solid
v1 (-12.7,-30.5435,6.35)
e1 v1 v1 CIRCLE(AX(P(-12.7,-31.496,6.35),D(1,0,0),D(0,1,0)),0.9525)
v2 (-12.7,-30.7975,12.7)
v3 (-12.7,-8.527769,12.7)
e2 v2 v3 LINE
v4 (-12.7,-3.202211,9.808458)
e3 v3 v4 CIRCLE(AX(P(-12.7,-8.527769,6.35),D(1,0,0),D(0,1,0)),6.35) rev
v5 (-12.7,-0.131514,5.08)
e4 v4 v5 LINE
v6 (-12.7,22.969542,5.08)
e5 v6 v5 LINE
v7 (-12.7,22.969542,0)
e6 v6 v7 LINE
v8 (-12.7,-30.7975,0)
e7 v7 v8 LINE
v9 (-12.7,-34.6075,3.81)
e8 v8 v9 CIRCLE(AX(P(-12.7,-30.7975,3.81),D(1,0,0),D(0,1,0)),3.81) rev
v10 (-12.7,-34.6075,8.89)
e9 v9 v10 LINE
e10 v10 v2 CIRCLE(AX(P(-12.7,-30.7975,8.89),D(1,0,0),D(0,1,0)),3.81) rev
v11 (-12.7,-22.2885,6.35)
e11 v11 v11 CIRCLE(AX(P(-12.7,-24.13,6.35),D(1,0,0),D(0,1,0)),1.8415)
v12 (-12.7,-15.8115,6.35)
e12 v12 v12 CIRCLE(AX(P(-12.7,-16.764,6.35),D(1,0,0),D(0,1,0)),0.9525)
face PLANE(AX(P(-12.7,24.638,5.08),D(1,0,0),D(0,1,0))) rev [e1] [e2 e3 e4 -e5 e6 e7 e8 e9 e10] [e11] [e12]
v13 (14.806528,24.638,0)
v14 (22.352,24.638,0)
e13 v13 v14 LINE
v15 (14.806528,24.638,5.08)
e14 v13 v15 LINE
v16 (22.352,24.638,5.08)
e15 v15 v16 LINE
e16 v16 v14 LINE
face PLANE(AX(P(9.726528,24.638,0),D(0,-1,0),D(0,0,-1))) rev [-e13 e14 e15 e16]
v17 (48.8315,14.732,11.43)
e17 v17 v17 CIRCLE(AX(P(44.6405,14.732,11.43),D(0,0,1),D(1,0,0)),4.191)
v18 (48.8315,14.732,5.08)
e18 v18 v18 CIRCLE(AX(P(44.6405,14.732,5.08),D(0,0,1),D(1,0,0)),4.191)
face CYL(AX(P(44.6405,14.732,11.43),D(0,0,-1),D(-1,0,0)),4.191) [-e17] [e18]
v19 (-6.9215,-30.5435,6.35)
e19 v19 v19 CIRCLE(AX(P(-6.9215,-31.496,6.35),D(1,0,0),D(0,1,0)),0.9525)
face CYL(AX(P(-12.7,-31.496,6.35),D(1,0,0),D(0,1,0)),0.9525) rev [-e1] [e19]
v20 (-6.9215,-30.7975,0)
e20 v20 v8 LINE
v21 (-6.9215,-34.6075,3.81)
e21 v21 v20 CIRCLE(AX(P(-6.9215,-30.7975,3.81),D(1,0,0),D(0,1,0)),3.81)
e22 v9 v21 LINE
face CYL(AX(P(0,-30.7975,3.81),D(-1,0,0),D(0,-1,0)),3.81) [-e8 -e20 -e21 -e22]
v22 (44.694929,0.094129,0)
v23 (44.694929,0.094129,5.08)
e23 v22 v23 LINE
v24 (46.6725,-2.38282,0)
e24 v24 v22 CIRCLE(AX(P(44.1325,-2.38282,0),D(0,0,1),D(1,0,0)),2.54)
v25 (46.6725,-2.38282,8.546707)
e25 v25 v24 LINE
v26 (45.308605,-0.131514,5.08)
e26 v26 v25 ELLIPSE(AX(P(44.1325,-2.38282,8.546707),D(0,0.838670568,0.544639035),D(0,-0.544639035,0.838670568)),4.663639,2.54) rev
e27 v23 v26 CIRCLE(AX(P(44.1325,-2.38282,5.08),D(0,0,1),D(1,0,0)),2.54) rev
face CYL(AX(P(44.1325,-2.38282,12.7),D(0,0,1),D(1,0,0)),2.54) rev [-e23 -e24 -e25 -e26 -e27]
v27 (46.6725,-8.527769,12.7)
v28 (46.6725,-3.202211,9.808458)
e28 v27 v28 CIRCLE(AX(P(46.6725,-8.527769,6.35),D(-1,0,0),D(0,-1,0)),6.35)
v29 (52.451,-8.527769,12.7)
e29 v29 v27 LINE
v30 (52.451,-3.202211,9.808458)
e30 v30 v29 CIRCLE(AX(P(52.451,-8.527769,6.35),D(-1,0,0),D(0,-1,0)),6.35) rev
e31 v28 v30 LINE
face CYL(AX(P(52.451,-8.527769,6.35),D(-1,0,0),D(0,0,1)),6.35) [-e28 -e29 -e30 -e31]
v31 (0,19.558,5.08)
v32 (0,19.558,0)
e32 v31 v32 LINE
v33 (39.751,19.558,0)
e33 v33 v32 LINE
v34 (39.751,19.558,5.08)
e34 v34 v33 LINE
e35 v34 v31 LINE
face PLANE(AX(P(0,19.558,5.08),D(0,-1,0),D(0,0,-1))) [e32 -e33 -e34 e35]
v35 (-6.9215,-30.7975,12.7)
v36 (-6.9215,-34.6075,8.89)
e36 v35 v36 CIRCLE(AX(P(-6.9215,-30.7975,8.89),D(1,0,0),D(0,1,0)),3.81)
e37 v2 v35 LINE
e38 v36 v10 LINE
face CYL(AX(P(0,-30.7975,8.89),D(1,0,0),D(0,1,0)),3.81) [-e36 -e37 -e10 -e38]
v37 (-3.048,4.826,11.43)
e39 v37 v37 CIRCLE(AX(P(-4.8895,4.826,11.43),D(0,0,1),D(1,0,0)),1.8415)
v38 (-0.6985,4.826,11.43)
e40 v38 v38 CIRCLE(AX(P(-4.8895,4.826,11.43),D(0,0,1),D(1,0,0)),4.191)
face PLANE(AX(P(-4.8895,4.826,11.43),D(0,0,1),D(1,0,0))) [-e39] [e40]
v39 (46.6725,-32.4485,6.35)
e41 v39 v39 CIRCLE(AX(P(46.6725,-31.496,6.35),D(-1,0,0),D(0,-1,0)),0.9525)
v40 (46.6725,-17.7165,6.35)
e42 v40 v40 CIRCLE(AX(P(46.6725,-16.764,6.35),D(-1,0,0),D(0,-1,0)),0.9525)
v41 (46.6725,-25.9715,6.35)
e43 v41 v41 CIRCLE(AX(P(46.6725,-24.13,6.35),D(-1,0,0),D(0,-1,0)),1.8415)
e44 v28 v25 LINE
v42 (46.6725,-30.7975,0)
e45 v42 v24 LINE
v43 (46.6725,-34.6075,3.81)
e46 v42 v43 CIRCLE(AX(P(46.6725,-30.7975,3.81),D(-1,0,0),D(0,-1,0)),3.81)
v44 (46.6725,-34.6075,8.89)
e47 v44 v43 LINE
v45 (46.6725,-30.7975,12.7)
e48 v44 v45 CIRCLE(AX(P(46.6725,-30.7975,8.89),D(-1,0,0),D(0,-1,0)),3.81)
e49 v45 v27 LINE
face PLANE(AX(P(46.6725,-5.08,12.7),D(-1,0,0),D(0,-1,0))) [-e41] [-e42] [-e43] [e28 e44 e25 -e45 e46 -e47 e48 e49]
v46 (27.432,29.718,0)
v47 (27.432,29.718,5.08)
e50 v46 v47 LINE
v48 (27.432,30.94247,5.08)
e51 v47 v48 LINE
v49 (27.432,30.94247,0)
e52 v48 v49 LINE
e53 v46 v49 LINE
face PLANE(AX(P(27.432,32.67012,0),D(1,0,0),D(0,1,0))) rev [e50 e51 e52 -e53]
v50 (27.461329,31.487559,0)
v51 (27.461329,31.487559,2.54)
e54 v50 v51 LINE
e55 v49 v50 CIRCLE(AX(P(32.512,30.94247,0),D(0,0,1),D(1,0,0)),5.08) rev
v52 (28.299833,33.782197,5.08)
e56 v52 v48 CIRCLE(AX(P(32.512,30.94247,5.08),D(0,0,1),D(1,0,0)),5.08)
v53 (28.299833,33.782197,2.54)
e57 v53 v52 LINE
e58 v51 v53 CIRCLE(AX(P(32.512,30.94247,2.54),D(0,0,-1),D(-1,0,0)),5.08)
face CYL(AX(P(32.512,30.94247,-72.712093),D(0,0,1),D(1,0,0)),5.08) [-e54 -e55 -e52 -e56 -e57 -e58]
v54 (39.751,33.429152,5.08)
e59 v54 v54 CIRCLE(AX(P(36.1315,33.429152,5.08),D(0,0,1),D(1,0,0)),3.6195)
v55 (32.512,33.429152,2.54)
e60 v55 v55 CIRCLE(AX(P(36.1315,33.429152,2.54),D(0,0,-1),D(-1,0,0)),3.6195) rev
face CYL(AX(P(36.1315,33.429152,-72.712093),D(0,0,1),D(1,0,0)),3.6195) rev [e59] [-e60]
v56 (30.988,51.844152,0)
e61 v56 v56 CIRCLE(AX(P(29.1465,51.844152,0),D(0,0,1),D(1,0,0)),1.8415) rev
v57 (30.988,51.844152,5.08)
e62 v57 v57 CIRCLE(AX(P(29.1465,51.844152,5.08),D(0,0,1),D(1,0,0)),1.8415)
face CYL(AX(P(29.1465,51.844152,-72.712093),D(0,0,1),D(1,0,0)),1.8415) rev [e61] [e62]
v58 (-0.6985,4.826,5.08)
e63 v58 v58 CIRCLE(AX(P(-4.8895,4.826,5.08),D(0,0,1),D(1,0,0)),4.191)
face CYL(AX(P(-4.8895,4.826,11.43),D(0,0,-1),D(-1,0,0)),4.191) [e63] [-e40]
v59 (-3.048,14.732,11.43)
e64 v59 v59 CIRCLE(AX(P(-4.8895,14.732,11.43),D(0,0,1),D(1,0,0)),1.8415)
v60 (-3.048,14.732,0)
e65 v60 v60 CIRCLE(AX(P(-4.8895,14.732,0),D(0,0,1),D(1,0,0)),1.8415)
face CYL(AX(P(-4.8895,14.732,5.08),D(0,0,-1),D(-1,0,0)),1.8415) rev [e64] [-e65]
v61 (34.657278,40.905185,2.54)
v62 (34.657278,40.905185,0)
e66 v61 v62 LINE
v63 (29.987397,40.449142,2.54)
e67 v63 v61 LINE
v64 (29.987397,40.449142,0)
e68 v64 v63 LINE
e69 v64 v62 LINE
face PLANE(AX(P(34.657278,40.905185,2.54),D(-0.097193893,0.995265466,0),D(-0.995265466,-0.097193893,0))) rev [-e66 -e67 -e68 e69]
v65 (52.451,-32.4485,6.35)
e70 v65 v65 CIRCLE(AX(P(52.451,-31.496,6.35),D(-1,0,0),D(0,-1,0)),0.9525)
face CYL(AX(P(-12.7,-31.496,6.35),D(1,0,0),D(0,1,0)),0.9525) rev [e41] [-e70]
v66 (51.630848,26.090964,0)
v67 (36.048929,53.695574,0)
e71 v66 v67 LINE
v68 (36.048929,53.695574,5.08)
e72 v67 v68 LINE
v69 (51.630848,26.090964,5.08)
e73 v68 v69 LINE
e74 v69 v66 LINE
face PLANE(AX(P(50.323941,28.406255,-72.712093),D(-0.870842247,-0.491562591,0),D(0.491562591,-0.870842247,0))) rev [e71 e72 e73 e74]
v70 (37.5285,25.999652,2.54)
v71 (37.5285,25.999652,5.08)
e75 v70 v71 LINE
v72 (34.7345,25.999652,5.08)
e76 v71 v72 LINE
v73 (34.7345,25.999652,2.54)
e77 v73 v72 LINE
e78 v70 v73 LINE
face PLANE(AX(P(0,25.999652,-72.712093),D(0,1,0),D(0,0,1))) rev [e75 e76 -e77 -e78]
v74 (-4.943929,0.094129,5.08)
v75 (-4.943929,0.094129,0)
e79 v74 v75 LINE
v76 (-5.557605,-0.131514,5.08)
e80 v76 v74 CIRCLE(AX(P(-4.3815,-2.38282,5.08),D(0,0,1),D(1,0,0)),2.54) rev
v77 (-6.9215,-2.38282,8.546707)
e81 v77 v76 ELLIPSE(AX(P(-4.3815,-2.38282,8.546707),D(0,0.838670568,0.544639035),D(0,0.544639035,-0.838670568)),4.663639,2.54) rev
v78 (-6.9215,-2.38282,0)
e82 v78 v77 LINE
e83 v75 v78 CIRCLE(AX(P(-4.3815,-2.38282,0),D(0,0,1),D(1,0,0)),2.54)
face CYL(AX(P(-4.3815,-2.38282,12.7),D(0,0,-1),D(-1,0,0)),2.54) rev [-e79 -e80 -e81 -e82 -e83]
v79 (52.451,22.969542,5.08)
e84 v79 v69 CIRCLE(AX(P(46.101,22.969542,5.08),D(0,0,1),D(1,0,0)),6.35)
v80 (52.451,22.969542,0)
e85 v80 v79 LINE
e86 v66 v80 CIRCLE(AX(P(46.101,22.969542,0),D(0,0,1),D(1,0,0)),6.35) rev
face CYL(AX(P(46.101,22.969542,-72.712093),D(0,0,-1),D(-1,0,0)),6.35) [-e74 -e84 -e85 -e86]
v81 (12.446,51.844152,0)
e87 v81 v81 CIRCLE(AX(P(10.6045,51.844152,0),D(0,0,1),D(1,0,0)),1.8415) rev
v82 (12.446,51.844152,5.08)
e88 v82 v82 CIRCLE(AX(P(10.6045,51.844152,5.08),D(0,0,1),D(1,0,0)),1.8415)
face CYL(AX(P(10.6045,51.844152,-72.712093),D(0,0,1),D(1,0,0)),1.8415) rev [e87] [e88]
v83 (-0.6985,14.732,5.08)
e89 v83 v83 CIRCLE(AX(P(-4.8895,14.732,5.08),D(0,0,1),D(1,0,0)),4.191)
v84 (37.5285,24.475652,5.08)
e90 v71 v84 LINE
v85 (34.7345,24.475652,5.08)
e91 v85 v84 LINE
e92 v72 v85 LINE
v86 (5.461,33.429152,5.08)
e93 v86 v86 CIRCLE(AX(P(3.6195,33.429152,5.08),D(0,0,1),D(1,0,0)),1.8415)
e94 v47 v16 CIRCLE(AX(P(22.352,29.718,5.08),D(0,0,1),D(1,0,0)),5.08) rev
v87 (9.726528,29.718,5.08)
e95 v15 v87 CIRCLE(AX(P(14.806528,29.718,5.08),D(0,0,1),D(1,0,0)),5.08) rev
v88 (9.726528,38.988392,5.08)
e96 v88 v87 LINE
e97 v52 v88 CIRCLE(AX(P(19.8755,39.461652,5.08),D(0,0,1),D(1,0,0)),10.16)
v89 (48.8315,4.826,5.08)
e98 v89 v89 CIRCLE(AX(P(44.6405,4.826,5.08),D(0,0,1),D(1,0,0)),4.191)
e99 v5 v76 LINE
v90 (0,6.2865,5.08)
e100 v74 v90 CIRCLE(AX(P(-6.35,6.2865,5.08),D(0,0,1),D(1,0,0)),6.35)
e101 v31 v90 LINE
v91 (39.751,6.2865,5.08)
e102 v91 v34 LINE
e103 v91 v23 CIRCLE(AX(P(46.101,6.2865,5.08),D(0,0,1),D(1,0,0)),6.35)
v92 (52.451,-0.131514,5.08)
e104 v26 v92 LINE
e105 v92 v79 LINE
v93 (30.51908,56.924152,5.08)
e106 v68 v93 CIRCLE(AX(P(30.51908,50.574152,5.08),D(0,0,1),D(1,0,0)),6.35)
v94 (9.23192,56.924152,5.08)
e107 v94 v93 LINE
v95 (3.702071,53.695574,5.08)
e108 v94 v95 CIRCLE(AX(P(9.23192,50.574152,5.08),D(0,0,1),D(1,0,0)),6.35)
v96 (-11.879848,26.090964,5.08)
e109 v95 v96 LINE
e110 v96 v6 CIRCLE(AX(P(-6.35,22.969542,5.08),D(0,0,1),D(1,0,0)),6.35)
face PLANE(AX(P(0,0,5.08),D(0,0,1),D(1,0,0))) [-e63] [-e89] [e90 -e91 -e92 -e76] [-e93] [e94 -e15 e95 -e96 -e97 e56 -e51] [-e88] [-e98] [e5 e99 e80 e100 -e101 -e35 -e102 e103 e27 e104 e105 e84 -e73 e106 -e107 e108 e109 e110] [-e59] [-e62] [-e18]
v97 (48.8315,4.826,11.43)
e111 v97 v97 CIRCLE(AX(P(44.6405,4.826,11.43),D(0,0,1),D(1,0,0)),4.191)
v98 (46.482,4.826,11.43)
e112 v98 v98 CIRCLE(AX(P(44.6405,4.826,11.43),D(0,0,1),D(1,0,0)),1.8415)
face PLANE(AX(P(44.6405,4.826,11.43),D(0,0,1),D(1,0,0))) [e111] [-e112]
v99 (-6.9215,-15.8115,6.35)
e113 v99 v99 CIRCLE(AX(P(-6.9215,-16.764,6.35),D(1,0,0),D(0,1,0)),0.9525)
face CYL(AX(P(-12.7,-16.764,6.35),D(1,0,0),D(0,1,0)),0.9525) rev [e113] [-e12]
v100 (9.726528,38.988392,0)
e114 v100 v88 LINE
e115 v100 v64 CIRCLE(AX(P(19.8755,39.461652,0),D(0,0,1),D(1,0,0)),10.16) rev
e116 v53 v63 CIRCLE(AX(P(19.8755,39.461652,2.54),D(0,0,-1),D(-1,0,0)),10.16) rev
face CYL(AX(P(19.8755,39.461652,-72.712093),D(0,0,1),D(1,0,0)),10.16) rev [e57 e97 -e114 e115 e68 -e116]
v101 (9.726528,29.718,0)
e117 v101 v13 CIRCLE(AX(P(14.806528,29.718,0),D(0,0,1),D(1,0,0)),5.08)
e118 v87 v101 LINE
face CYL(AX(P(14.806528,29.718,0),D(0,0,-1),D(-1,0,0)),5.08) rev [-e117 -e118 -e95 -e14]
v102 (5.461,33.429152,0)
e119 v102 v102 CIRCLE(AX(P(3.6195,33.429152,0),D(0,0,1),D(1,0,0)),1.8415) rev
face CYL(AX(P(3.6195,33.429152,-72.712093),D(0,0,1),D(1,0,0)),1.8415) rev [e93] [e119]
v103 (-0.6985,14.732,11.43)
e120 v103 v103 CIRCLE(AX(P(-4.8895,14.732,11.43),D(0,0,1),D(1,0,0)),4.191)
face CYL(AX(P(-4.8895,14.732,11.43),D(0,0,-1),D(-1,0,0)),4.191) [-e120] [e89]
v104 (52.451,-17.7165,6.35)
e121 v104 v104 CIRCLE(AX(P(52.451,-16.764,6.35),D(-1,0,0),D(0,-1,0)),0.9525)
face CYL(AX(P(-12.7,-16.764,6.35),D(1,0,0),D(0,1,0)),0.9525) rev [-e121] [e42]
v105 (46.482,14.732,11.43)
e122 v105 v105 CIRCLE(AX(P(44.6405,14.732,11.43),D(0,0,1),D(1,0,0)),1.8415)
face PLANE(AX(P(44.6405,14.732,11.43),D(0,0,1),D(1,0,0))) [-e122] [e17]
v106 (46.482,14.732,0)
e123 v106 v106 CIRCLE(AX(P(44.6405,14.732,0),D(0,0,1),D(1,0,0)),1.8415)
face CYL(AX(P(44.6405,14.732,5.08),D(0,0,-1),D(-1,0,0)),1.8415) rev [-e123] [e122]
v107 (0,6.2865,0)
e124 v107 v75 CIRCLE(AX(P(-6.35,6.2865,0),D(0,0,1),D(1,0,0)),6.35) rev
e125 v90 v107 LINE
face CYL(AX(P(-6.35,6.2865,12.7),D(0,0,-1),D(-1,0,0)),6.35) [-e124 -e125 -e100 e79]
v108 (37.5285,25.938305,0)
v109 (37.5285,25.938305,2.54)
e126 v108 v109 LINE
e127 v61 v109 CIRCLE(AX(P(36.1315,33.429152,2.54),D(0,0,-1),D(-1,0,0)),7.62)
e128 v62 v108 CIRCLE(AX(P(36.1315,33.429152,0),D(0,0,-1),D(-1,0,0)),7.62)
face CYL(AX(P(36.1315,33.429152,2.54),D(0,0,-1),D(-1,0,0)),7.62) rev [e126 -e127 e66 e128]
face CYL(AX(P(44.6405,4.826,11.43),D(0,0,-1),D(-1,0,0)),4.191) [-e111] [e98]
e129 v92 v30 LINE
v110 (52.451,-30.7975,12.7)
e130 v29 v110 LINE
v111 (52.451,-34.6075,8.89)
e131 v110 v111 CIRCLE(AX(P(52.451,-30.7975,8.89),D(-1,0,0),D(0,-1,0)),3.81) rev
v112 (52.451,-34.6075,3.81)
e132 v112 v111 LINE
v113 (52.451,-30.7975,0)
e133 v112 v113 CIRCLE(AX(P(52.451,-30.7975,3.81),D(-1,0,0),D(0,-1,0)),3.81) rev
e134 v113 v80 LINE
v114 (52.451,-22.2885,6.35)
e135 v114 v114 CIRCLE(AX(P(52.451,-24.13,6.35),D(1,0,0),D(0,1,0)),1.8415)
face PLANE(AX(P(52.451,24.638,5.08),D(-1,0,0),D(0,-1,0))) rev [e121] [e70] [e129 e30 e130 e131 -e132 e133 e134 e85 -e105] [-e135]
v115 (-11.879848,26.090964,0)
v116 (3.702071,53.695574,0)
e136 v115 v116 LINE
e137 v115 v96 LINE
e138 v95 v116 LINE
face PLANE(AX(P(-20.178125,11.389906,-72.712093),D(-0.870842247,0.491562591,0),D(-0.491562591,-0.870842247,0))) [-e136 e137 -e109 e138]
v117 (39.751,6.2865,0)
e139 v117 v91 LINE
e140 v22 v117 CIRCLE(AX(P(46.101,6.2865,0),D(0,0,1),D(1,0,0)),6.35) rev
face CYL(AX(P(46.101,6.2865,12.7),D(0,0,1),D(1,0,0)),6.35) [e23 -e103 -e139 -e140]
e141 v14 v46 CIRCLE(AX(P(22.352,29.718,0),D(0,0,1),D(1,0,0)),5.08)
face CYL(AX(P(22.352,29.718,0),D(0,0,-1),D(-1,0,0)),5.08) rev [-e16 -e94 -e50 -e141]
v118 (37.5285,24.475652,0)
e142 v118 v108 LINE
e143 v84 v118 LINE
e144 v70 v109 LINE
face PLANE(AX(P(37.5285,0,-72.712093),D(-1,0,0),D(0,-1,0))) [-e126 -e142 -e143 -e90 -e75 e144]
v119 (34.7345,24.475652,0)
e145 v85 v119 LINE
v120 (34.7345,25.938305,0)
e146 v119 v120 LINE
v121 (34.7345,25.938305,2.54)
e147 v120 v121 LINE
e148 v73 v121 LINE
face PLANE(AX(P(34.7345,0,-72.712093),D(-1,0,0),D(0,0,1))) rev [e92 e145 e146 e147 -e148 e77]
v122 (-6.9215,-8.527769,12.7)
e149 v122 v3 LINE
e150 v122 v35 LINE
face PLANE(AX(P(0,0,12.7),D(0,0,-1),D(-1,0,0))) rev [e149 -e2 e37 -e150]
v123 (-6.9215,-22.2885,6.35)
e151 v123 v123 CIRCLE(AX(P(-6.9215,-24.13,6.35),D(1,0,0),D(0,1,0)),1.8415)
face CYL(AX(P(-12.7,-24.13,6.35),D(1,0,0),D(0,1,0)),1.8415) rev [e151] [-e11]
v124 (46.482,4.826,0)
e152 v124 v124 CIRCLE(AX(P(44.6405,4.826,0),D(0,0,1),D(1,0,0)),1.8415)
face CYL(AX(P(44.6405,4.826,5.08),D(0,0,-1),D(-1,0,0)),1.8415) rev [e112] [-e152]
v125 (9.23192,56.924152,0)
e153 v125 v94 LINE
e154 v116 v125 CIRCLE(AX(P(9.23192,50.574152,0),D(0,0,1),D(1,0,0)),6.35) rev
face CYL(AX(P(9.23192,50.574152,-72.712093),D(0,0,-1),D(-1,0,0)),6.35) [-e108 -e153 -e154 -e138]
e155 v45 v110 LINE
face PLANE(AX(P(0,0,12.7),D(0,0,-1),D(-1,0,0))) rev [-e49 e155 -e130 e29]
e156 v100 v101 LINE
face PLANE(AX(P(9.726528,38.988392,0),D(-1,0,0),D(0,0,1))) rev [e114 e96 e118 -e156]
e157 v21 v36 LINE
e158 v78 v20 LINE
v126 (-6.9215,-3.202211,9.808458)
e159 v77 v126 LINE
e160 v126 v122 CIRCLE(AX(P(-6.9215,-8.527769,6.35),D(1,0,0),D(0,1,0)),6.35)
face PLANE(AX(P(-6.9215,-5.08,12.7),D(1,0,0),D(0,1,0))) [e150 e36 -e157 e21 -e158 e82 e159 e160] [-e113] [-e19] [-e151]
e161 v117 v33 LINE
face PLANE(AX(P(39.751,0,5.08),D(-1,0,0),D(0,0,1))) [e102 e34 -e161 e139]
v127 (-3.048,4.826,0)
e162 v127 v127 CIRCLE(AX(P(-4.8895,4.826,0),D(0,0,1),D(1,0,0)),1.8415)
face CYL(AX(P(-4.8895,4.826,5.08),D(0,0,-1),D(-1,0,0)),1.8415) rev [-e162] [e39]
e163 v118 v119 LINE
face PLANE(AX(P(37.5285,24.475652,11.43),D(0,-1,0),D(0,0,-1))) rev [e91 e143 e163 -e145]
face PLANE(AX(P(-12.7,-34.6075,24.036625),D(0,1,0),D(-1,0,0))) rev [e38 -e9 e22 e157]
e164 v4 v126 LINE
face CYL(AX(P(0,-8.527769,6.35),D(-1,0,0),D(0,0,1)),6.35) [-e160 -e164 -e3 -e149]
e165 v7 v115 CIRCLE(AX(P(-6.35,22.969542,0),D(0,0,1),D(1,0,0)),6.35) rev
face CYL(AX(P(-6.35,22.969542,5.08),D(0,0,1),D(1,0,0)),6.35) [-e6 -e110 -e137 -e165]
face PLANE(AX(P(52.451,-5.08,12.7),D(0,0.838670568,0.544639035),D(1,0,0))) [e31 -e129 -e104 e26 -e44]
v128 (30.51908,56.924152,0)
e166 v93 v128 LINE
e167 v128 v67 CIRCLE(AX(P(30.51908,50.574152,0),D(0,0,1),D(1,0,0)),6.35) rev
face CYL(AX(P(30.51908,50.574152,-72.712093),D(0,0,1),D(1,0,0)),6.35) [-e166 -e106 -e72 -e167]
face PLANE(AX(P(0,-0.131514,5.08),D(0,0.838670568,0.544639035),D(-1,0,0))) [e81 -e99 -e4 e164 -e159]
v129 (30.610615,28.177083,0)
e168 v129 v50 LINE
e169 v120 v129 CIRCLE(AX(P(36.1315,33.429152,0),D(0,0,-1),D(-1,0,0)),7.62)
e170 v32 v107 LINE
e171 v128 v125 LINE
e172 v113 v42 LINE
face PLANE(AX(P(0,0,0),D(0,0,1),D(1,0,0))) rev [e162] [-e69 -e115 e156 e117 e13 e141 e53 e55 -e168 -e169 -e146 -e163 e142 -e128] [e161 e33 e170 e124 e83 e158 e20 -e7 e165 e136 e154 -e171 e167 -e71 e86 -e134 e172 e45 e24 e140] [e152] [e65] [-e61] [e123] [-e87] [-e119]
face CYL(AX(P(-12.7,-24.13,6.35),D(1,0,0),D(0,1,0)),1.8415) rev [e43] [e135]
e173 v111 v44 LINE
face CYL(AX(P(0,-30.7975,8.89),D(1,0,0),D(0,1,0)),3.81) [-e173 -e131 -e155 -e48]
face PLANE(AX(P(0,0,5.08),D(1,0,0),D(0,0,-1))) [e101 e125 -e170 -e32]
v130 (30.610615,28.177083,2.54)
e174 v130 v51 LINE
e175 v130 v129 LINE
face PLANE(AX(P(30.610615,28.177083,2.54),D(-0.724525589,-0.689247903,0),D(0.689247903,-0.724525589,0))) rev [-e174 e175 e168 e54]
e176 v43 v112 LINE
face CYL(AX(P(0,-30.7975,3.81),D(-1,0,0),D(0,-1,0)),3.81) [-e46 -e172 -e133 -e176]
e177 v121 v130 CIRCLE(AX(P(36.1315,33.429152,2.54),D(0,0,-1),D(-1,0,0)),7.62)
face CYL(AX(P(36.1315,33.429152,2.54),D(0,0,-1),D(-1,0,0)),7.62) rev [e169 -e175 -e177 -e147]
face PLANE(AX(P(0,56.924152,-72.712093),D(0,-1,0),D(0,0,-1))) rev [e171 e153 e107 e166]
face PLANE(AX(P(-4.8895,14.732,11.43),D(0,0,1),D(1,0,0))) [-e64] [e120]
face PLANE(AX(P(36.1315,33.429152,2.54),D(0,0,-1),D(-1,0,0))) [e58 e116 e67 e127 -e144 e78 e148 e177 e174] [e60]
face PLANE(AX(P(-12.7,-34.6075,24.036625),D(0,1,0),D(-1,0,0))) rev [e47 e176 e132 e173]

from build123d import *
from OCP.BRepFilletAPI import BRepFilletAPI_MakeChamfer

# Parameters (mm, degrees)
SKETCH1_W                = 65.151
SKETCH1_H                = 29.718
SKETCH1_R                = 1.8415
SKETCH1_W_2              = 39.751
SKETCH1_H_2              = 19.558
BOSS_EXTRUDE1_DEPTH      = 5.08
SKETCH2_R                = 4.191
SKETCH2_R_2              = 1.8415
BOSS_EXTRUDE2_DEPTH      = 6.35
SKETCH3_R                = 1.8415
SKETCH3_R_2              = 3.6195
SKETCH3_R_3              = 10.16
SKETCH3_W                = 20.32
SKETCH3_H                = 10.16
BOSS_EXTRUDE3_DEPTH      = 5.08
CUT_EXTRUDE1_DEPTH       = 2.54
CUT_EXTRUDE2_DEPTH       = 78.913404351
CUT_EXTRUDE2_DEPTH_BACK  = 78.913404351
SKETCH5_W                = 2.794
SKETCH5_H                = 1.524
FILLET1_R                = 6.35
CHAMFER1_SIZE            = 6.35
CUT_EXTRUDE3_DEPTH       = 79.243922304
CUT_EXTRUDE3_DEPTH_BACK  = 79.243922304
SKETCH7_W                = 5.7785
SKETCH7_H                = 38.1
BOSS_EXTRUDE4_DEPTH      = 12.7
CUT_EXTRUDE4_DEPTH       = 84.227055894
CUT_EXTRUDE4_DEPTH_BACK  = 84.227055894
SKETCH8_R                = 1.8415
SKETCH8_W                = 41.273071729
SKETCH8_H                = 30.163795182
CUT_EXTRUDE7_DEPTH       = 79.439508397
CUT_EXTRUDE7_DEPTH_BACK  = 79.439508397
SKETCH13_W               = 7.413158878
SKETCH13_H               = 5.0165
SKETCH13_W_2             = 10.14650482
CHAMFER2_SIZE            = 4.94848586
CHAMFER2_SIZE_2          = 7.62
FILLET4_R                = 3.81
CUT_EXTRUDE9_DEPTH       = 88.443135108
CUT_EXTRUDE9_DEPTH_BACK  = 88.443135108
SKETCH16_R               = 0.9525
FILLET5_R                = 6.35
FILLET6_R                = 2.54
FILLET7_START            = -14
FILLET7_DEPTH            = 67
CUT_EXTRUDE10_DEPTH      = 78.778730238
CUT_EXTRUDE10_DEPTH_BACK = 78.778730238
FILLET8_R                = 5.08


with BuildPart() as part:
    # Sketch1 → Boss-Extrude1 (new body)
    with BuildSketch(Plane.XY):
        with Locations((19.8755, 9.779)):
            Rectangle(SKETCH1_W, SKETCH1_H)
        with Locations((-4.8895, 14.732)):
            Circle(SKETCH1_R, mode=Mode.SUBTRACT)
        with Locations((-4.8895, 4.826)):
            Circle(SKETCH1_R, mode=Mode.SUBTRACT)
        with Locations((44.6405, 14.732)):
            Circle(SKETCH1_R, mode=Mode.SUBTRACT)
        with Locations((44.6405, 4.826)):
            Circle(SKETCH1_R, mode=Mode.SUBTRACT)
        with Locations((19.8755, 9.779)):
            Rectangle(SKETCH1_W_2, SKETCH1_H_2, mode=Mode.SUBTRACT)
    extrude(amount=BOSS_EXTRUDE1_DEPTH)

    # Sketch2 → Boss-Extrude2 (add)
    # profile 1 of 4: a face of its own
    with BuildSketch(Plane.XY.offset(5.08)):
        with Locations((-4.8895, 14.732)):
            Circle(SKETCH2_R)
        with Locations((-4.8895, 14.732)):
            Circle(SKETCH2_R_2, mode=Mode.SUBTRACT)
    # profile 2 of 4: a face of its own
    with BuildSketch(Plane.XY.offset(5.08)):
        with Locations((-4.8895, 4.826)):
            Circle(SKETCH2_R)
        with Locations((-4.8895, 4.826)):
            Circle(SKETCH2_R_2, mode=Mode.SUBTRACT)
    # profile 3 of 4: a face of its own
    with BuildSketch(Plane.XY.offset(5.08)):
        with Locations((44.6405, 14.732)):
            Circle(SKETCH2_R)
        with Locations((44.6405, 14.732)):
            Circle(SKETCH2_R_2, mode=Mode.SUBTRACT)
    # profile 4 of 4: a face of its own
    with BuildSketch(Plane.XY.offset(5.08)):
        with Locations((44.6405, 4.826)):
            Circle(SKETCH2_R)
        with Locations((44.6405, 4.826)):
            Circle(SKETCH2_R_2, mode=Mode.SUBTRACT)
    extrude(amount=BOSS_EXTRUDE2_DEPTH)

    # Sketch3 → Boss-Extrude3 (add)
    # profile 1 of 2: a face of its own
    with BuildSketch(Plane.XY.offset(5.08)):
        Polygon((34.7345, 25.999651961), (37.5285, 25.999651961), (37.5285, 24.638), (52.451, 24.638), (34.2265, 56.924151961), (5.5245, 56.924151961), (-12.7, 24.638), (34.7345, 24.638), align=None)
        with Locations((3.6195, 33.429151961)):
            Circle(SKETCH3_R, mode=Mode.SUBTRACT)
        with Locations((10.6045, 51.844151961)):
            Circle(SKETCH3_R, mode=Mode.SUBTRACT)
        with Locations((36.1315, 33.429151961)):
            Circle(SKETCH3_R_2, mode=Mode.SUBTRACT)
        with Locations((19.8755, 39.461651961)):
            Circle(SKETCH3_R_3, mode=Mode.SUBTRACT)
        with Locations((29.1465, 51.844151961)):
            Circle(SKETCH3_R, mode=Mode.SUBTRACT)
    # profile 2 of 2: a face of its own
    with BuildSketch(Plane.XY.offset(5.08)):
        with Locations((19.8755, -10.16)):
            Rectangle(SKETCH3_W, SKETCH3_H)
        with Locations((14.7955, -10.16)):
            Circle(SKETCH3_R, mode=Mode.SUBTRACT)
        with Locations((24.9555, -10.16)):
            Circle(SKETCH3_R, mode=Mode.SUBTRACT)
    extrude(amount=-BOSS_EXTRUDE3_DEPTH)

    # Sketch4 → Cut-Extrude1 (cut)
    with BuildSketch(Plane(origin=(0, 0, 0), x_dir=(-1, 0, 0), z_dir=(0, 0, -1))):
        with BuildLine():
            Line((-34.657278026, 40.905184972), (-19.8755, 39.461651961))
            Line((-19.8755, 39.461651961), (-30.610615013, 28.177082944))
            ThreePointArc((-30.610615013, 28.177082944), (-43.393319721, 31.120391613), (-34.657278026, 40.905184972))
        make_face()
    extrude(amount=-CUT_EXTRUDE1_DEPTH, mode=Mode.SUBTRACT)

    # Sketch5 → Cut-Extrude2 (cut, two sides: drawn at the far end of the back side and taken through both)
    with BuildSketch(Plane(origin=(0, 0, 2.54), x_dir=(-1, 0, 0), z_dir=(0, 0, -1)).offset(-CUT_EXTRUDE2_DEPTH_BACK)):
        with Locations((-36.1315, 25.237651961)):
            Rectangle(SKETCH5_W, SKETCH5_H)
    extrude(amount=CUT_EXTRUDE2_DEPTH + CUT_EXTRUDE2_DEPTH_BACK, mode=Mode.SUBTRACT)

    # Fillet1
    fillet1_edges = [part.edges().sort_by_distance(p)[0] for p in [
        (5.5245, 56.924151961, 2.54),
        (34.2265, 56.924151961, 2.54),
        (-12.7, 24.638, 2.54),
        (52.451, 24.638, 2.54),
    ]]
    fillet(fillet1_edges, radius=FILLET1_R)

    # Chamfer1
    chamfer1_edges = [part.edges().sort_by_distance(p)[0] for p in [
        (9.7155, -5.08, 2.54),
        (30.0355, -5.08, 2.54),
    ]]
    chamfer(chamfer1_edges, length=CHAMFER1_SIZE)

    # Sketch6 → Cut-Extrude3 (cut, two sides: drawn at the far end of the back side and taken through both)
    with BuildSketch(Plane(origin=(0, 0, 0), x_dir=(-1, 0, 0), z_dir=(0, 0, -1)).offset(-CUT_EXTRUDE3_DEPTH_BACK)):
        Polygon((-52.451, -5.08), (-39.751, -5.08), (-39.751, 0), (0, 0), (0, -5.08), (12.7, -5.08), (12.7, -17.29518095), (-52.451, -17.29518095), align=None)
    extrude(amount=CUT_EXTRUDE3_DEPTH + CUT_EXTRUDE3_DEPTH_BACK, mode=Mode.SUBTRACT)

    # Sketch7 → Boss-Extrude4 (add)
    with BuildSketch(Plane(origin=(0, 0, 0), x_dir=(-1, 0, 0), z_dir=(0, 0, -1))):
        with Locations((-49.56175, -24.13)):
            Rectangle(SKETCH7_W, SKETCH7_H)
        with Locations((9.81075, -24.13)):
            Rectangle(SKETCH7_W, SKETCH7_H)
    extrude(amount=-BOSS_EXTRUDE4_DEPTH)

    # Sketch8 → Cut-Extrude4 (cut, two sides: drawn at the far end of the back side and taken through both)
    with BuildSketch(Plane(origin=(-6.9215, 0, 0), x_dir=(0, 0, -1), z_dir=(1, 0, 0)).offset(-CUT_EXTRUDE4_DEPTH_BACK)):
        with Locations(Location((-6.35, -24.13, 0), (0, 0, 90))):
            Circle(SKETCH8_R)
        with Locations((-3.400089219, -49.689397591)):
            Rectangle(SKETCH8_W, SKETCH8_H)
    extrude(amount=CUT_EXTRUDE4_DEPTH + CUT_EXTRUDE4_DEPTH_BACK, mode=Mode.SUBTRACT)

    # Sketch13 → Cut-Extrude7 (cut, two sides: drawn at the far end of the back side and taken through both)
    with BuildSketch(Plane(origin=(0, 0, 0), x_dir=(-1, 0, 0), z_dir=(0, 0, -1)).offset(-CUT_EXTRUDE7_DEPTH_BACK)):
        with Locations((-42.965920561, -2.57175)):
            Rectangle(SKETCH13_W, SKETCH13_H)
        with Locations((1.84824759, -2.57175)):
            Rectangle(SKETCH13_W_2, SKETCH13_H)
    extrude(amount=CUT_EXTRUDE7_DEPTH + CUT_EXTRUDE7_DEPTH_BACK, mode=Mode.SUBTRACT)

    # Chamfer2
    chamfer2_edges_1 = [part.edges().sort_by_distance(p)[0] for p in [
        (-9.81075, -5.08, 5.08),
    ]]
    chamfer2_side_1 = [part.faces().sort_by_distance(p)[0] for p in [
        (-9.81075, -4.981030283, 5.08),
    ]]
    chamfer2_edges_2 = [part.edges().sort_by_distance(p)[0] for p in [
        (49.56175, -5.08, 5.08),
    ]]
    chamfer2_side_2 = [part.faces().sort_by_distance(p)[0] for p in [
        (49.56175, -4.981030283, 5.08),
    ]]
    chamfer2 = BRepFilletAPI_MakeChamfer(part.part.solid().wrapped)
    for e in chamfer2_edges_1:
        chamfer2.Add(CHAMFER2_SIZE - 0.0001, CHAMFER2_SIZE_2 - 0.0001, e.wrapped, chamfer2_side_1[0].wrapped)
    for e in chamfer2_edges_2:
        chamfer2.Add(CHAMFER2_SIZE - 0.0001, CHAMFER2_SIZE_2 - 0.0001, e.wrapped, chamfer2_side_2[0].wrapped)
    add(Compound.cast(chamfer2.Shape()), mode=Mode.REPLACE)  # a hair under: the kernel refuses the full size

    # Fillet4
    fillet4_edges = [part.edges().sort_by_distance(p)[0] for p in [
        (-9.81075, -34.6075, 12.7),
        (49.56175, -34.6075, 0),
        (49.56175, -34.6075, 12.7),
        (-9.81075, -34.6075, 0),
    ]]
    fillet(fillet4_edges, radius=FILLET4_R)

    # Sketch16 → Cut-Extrude9 (cut, two sides: drawn at the far end of the back side and taken through both)
    with BuildSketch(Plane(origin=(52.451, 0, 0), x_dir=(0, 0, -1), z_dir=(1, 0, 0)).offset(-CUT_EXTRUDE9_DEPTH_BACK)):
        with Locations(Location((-6.35, -16.764, 0), (0, 0, 90))):
            Circle(SKETCH16_R)
        with Locations(Location((-6.35, -31.496, 0), (0, 0, 90))):
            Circle(SKETCH16_R)
    extrude(amount=CUT_EXTRUDE9_DEPTH + CUT_EXTRUDE9_DEPTH_BACK, mode=Mode.SUBTRACT)

    # Fillet5
    fillet5_edges = [part.edges().sort_by_distance(p)[0] for p in [
        (39.751, -0.0635, 2.54),
        (0, -0.0635, 2.54),
    ]]
    fillet(fillet5_edges, radius=FILLET5_R)

    # Fillet6
    # the kernel refuses this fillet: 2.54 mm, written as the material it adds along each edge
    with BuildSketch(Plane(origin=(-6.9215, -0.0635, 10.878299782), x_dir=(0.9968383598531511, 0.07945617864760274, 0), z_dir=(0, 0, -1))) as fillet6_piece_1_section:
        with BuildLine():
            CenterArc((2.347685137, 2.513805752), FILLET6_R, 184.557307561, 77.207046273)
            Line((-0.184284297, 2.311987058), (-0.437481241, 2.291805188))
            Line((-0.437481241, 2.291805188), (-0.253196943, -0.020181869))
            Line((-0.253196943, -0.020181869), (0.020181869, -0.253196943))
            ThreePointArc((0.020181869, -0.253196943), (0.589874992, -0.207787737), (1.947459477, -0.251380575))
            Line((1.947459477, -0.251380575), (1.983843628, 0))
        make_face()
    fillet6_piece_1 = extrude(amount=10.878299782, mode=Mode.PRIVATE)
    fillet6_piece_1 = split(fillet6_piece_1, bisect_by=Plane(origin=(-6.9215, -0.0635, 5.08), z_dir=(0, 0, 1)), keep=Keep.TOP, mode=Mode.PRIVATE)
    fillet6_piece_1 = split(fillet6_piece_1, bisect_by=Plane(origin=(-6.9215, -2.759907111, 9.127244936), z_dir=(0, -0.8386723305166582, -0.5446363208837226)), keep=Keep.TOP, mode=Mode.PRIVATE)
    add(fillet6_piece_1)
    with BuildSketch(Plane(origin=(-6.9215, -0.0635, 5.08), x_dir=(0.9968383598531511, 0.07945617864760274, 0), z_dir=(0, 0, -1))) as fillet6_piece_2_section:
        with BuildLine():
            CenterArc((2.347685137, 2.513805752), FILLET6_R, 184.557307561, 77.207046273)
            Line((-0.184284297, 2.311987058), (-0.437481241, 2.291805188))
            Line((-0.437481241, 2.291805188), (-0.253196943, -0.020181869))
            Line((-0.253196943, -0.020181869), (0.020181869, -0.253196943))
            ThreePointArc((0.020181869, -0.253196943), (0.589874992, -0.207787737), (1.947459477, -0.251380575))
            Line((1.947459477, -0.251380575), (1.983843628, 0))
        make_face()
    fillet6_piece_2 = extrude(amount=5.08, mode=Mode.PRIVATE)
    fillet6_piece_2 = split(fillet6_piece_2, bisect_by=Plane(origin=(-6.9215, -0.11140953, 5.048887408), z_dir=(0, 0.8386723305166582, 0.5446363208837226)), keep=Keep.TOP, mode=Mode.PRIVATE)
    add(fillet6_piece_2)
    with BuildSketch(Plane(origin=(-6.9215, -0.0635, 5.08), x_dir=(0.9968383598531511, 0.07945617864760274, 0), z_dir=(0, 0, -1))) as fillet6_piece_3_section:
        with BuildLine():
            CenterArc((2.347685137, 2.513805752), FILLET6_R, 184.557307561, 77.207046273)
            Line((-0.184284297, 2.311987058), (-0.437481241, 2.291805188))
            Line((-0.437481241, 2.291805188), (-0.253196943, -0.020181869))
            Line((-0.253196943, -0.020181869), (0.020181869, -0.253196943))
            ThreePointArc((0.020181869, -0.253196943), (0.589874992, -0.207787737), (1.947459477, -0.251380575))
            Line((1.947459477, -0.251380575), (1.983843628, 0))
        make_face()
    fillet6_piece_3 = extrude(amount=5.08, mode=Mode.PRIVATE)
    fillet6_piece_3 = split(fillet6_piece_3, bisect_by=Plane(origin=(-6.9215, -0.11140953, 5.048887408), z_dir=(0, -0.8386723305166582, -0.5446363208837226)), keep=Keep.TOP, mode=Mode.PRIVATE)
    add(fillet6_piece_3)
    with BuildSketch(Plane(origin=(46.6725, -0.0635, 0), x_dir=(-0.996838359853151, 0.07945617864760328, 0), z_dir=(0, 0, 1))) as fillet6_piece_4_section:
        with BuildLine():
            CenterArc((2.347685137, 2.513805752), FILLET6_R, 184.557307561, 77.207046273)
            Line((-0.184284297, 2.311987058), (-0.437481241, 2.291805188))
            Line((-0.437481241, 2.291805188), (-0.253196943, -0.020181869))
            Line((-0.253196943, -0.020181869), (0.020181869, -0.253196943))
            ThreePointArc((0.020181869, -0.253196943), (0.589874992, -0.207787737), (1.947459477, -0.251380575))
            Line((1.947459477, -0.251380575), (1.983843628, 0))
        make_face()
    fillet6_piece_4 = extrude(amount=5.08, mode=Mode.PRIVATE)
    fillet6_piece_4 = split(fillet6_piece_4, bisect_by=Plane(origin=(46.6725, 2.208989246, 1.475761316), z_dir=(0, -0.8386723305166582, -0.5446363208837226)), keep=Keep.TOP, mode=Mode.PRIVATE)
    add(fillet6_piece_4)
    with BuildSketch(Plane(origin=(46.6725, -0.0635, 0), x_dir=(-0.996838359853151, 0.07945617864760328, 0), z_dir=(0, 0, 1))) as fillet6_piece_5_section:
        with BuildLine():
            CenterArc((2.347685137, 2.513805752), FILLET6_R, 184.557307561, 77.207046273)
            Line((-0.184284297, 2.311987058), (-0.437481241, 2.291805188))
            Line((-0.437481241, 2.291805188), (-0.253196943, -0.020181869))
            Line((-0.253196943, -0.020181869), (0.020181869, -0.253196943))
            ThreePointArc((0.020181869, -0.253196943), (0.589874992, -0.207787737), (1.947459477, -0.251380575))
            Line((1.947459477, -0.251380575), (1.983843628, 0))
        make_face()
    fillet6_piece_5 = extrude(amount=10.878299782, mode=Mode.PRIVATE)
    fillet6_piece_5 = split(fillet6_piece_5, bisect_by=Plane(origin=(46.6725, -0.0635, 5.08), z_dir=(0, 0, 1)), keep=Keep.TOP, mode=Mode.PRIVATE)
    fillet6_piece_5 = split(fillet6_piece_5, bisect_by=Plane(origin=(46.6725, 2.208989246, 1.475761316), z_dir=(0, -0.8386723305166582, -0.5446363208837226)), keep=Keep.TOP, mode=Mode.PRIVATE)
    add(fillet6_piece_5)
    with BuildSketch(Plane(origin=(46.6725, -0.0635, 0), x_dir=(-0.996838359853151, 0.07945617864760328, 0), z_dir=(0, 0, 1))) as fillet6_piece_6_section:
        with BuildLine():
            CenterArc((2.347685137, 2.513805752), FILLET6_R, 184.557307561, 77.207046273)
            Line((-0.184284297, 2.311987058), (-0.437481241, 2.291805188))
            Line((-0.437481241, 2.291805188), (-0.253196943, -0.020181869))
            Line((-0.253196943, -0.020181869), (0.020181869, -0.253196943))
            ThreePointArc((0.020181869, -0.253196943), (0.589874992, -0.207787737), (1.947459477, -0.251380575))
            Line((1.947459477, -0.251380575), (1.983843628, 0))
        make_face()
    fillet6_piece_6 = extrude(amount=5.08, mode=Mode.PRIVATE)
    fillet6_piece_6 = split(fillet6_piece_6, bisect_by=Plane(origin=(46.6725, 2.208989246, 1.475761316), z_dir=(0, 0.8386723305166582, 0.5446363208837226)), keep=Keep.TOP, mode=Mode.PRIVATE)
    add(fillet6_piece_6)

    # Fillet7: read off the stored shape, not the designer's step
    # Fillet7 outline → Fillet7 (cut)
    with BuildSketch(Plane.YZ.offset(FILLET7_START)):
        with BuildLine():
            Line((-5.08, 12.7), (-8.527768693, 12.7))
            ThreePointArc((-8.527768693, 12.7), (-5.497810565, 11.930488665), (-3.202210586, 9.808457872))
            Line((-3.202210586, 9.808457872), (-5.08, 12.7))
        make_face()
    extrude(amount=FILLET7_DEPTH, mode=Mode.SUBTRACT)

    # Sketch17 → Cut-Extrude10 (cut, two sides: drawn at the far end of the back side and taken through both)
    with BuildSketch(Plane.XY.offset(5.08).offset(-CUT_EXTRUDE10_DEPTH_BACK)):
        with BuildLine():
            Line((9.726528391, 24.638), (27.432, 24.638))
            Line((27.432, 24.638), (27.432, 32.670119899))
            ThreePointArc((27.432, 32.670119899), (16.460772064, 29.892679544), (9.726528391, 38.988391693))
            Line((9.726528391, 38.988391693), (9.726528391, 24.638))
        make_face()
    extrude(amount=CUT_EXTRUDE10_DEPTH + CUT_EXTRUDE10_DEPTH_BACK, mode=Mode.SUBTRACT)

    # Fillet8
    fillet8_edges = [part.edges().sort_by_distance(p)[0] for p in [
        (9.726528391, 24.638, 2.54),
        (27.432, 24.638, 2.54),
        (27.432, 32.670119899, 3.81),
    ]]
    fillet(fillet8_edges, radius=FILLET8_R)


solid = part.part
